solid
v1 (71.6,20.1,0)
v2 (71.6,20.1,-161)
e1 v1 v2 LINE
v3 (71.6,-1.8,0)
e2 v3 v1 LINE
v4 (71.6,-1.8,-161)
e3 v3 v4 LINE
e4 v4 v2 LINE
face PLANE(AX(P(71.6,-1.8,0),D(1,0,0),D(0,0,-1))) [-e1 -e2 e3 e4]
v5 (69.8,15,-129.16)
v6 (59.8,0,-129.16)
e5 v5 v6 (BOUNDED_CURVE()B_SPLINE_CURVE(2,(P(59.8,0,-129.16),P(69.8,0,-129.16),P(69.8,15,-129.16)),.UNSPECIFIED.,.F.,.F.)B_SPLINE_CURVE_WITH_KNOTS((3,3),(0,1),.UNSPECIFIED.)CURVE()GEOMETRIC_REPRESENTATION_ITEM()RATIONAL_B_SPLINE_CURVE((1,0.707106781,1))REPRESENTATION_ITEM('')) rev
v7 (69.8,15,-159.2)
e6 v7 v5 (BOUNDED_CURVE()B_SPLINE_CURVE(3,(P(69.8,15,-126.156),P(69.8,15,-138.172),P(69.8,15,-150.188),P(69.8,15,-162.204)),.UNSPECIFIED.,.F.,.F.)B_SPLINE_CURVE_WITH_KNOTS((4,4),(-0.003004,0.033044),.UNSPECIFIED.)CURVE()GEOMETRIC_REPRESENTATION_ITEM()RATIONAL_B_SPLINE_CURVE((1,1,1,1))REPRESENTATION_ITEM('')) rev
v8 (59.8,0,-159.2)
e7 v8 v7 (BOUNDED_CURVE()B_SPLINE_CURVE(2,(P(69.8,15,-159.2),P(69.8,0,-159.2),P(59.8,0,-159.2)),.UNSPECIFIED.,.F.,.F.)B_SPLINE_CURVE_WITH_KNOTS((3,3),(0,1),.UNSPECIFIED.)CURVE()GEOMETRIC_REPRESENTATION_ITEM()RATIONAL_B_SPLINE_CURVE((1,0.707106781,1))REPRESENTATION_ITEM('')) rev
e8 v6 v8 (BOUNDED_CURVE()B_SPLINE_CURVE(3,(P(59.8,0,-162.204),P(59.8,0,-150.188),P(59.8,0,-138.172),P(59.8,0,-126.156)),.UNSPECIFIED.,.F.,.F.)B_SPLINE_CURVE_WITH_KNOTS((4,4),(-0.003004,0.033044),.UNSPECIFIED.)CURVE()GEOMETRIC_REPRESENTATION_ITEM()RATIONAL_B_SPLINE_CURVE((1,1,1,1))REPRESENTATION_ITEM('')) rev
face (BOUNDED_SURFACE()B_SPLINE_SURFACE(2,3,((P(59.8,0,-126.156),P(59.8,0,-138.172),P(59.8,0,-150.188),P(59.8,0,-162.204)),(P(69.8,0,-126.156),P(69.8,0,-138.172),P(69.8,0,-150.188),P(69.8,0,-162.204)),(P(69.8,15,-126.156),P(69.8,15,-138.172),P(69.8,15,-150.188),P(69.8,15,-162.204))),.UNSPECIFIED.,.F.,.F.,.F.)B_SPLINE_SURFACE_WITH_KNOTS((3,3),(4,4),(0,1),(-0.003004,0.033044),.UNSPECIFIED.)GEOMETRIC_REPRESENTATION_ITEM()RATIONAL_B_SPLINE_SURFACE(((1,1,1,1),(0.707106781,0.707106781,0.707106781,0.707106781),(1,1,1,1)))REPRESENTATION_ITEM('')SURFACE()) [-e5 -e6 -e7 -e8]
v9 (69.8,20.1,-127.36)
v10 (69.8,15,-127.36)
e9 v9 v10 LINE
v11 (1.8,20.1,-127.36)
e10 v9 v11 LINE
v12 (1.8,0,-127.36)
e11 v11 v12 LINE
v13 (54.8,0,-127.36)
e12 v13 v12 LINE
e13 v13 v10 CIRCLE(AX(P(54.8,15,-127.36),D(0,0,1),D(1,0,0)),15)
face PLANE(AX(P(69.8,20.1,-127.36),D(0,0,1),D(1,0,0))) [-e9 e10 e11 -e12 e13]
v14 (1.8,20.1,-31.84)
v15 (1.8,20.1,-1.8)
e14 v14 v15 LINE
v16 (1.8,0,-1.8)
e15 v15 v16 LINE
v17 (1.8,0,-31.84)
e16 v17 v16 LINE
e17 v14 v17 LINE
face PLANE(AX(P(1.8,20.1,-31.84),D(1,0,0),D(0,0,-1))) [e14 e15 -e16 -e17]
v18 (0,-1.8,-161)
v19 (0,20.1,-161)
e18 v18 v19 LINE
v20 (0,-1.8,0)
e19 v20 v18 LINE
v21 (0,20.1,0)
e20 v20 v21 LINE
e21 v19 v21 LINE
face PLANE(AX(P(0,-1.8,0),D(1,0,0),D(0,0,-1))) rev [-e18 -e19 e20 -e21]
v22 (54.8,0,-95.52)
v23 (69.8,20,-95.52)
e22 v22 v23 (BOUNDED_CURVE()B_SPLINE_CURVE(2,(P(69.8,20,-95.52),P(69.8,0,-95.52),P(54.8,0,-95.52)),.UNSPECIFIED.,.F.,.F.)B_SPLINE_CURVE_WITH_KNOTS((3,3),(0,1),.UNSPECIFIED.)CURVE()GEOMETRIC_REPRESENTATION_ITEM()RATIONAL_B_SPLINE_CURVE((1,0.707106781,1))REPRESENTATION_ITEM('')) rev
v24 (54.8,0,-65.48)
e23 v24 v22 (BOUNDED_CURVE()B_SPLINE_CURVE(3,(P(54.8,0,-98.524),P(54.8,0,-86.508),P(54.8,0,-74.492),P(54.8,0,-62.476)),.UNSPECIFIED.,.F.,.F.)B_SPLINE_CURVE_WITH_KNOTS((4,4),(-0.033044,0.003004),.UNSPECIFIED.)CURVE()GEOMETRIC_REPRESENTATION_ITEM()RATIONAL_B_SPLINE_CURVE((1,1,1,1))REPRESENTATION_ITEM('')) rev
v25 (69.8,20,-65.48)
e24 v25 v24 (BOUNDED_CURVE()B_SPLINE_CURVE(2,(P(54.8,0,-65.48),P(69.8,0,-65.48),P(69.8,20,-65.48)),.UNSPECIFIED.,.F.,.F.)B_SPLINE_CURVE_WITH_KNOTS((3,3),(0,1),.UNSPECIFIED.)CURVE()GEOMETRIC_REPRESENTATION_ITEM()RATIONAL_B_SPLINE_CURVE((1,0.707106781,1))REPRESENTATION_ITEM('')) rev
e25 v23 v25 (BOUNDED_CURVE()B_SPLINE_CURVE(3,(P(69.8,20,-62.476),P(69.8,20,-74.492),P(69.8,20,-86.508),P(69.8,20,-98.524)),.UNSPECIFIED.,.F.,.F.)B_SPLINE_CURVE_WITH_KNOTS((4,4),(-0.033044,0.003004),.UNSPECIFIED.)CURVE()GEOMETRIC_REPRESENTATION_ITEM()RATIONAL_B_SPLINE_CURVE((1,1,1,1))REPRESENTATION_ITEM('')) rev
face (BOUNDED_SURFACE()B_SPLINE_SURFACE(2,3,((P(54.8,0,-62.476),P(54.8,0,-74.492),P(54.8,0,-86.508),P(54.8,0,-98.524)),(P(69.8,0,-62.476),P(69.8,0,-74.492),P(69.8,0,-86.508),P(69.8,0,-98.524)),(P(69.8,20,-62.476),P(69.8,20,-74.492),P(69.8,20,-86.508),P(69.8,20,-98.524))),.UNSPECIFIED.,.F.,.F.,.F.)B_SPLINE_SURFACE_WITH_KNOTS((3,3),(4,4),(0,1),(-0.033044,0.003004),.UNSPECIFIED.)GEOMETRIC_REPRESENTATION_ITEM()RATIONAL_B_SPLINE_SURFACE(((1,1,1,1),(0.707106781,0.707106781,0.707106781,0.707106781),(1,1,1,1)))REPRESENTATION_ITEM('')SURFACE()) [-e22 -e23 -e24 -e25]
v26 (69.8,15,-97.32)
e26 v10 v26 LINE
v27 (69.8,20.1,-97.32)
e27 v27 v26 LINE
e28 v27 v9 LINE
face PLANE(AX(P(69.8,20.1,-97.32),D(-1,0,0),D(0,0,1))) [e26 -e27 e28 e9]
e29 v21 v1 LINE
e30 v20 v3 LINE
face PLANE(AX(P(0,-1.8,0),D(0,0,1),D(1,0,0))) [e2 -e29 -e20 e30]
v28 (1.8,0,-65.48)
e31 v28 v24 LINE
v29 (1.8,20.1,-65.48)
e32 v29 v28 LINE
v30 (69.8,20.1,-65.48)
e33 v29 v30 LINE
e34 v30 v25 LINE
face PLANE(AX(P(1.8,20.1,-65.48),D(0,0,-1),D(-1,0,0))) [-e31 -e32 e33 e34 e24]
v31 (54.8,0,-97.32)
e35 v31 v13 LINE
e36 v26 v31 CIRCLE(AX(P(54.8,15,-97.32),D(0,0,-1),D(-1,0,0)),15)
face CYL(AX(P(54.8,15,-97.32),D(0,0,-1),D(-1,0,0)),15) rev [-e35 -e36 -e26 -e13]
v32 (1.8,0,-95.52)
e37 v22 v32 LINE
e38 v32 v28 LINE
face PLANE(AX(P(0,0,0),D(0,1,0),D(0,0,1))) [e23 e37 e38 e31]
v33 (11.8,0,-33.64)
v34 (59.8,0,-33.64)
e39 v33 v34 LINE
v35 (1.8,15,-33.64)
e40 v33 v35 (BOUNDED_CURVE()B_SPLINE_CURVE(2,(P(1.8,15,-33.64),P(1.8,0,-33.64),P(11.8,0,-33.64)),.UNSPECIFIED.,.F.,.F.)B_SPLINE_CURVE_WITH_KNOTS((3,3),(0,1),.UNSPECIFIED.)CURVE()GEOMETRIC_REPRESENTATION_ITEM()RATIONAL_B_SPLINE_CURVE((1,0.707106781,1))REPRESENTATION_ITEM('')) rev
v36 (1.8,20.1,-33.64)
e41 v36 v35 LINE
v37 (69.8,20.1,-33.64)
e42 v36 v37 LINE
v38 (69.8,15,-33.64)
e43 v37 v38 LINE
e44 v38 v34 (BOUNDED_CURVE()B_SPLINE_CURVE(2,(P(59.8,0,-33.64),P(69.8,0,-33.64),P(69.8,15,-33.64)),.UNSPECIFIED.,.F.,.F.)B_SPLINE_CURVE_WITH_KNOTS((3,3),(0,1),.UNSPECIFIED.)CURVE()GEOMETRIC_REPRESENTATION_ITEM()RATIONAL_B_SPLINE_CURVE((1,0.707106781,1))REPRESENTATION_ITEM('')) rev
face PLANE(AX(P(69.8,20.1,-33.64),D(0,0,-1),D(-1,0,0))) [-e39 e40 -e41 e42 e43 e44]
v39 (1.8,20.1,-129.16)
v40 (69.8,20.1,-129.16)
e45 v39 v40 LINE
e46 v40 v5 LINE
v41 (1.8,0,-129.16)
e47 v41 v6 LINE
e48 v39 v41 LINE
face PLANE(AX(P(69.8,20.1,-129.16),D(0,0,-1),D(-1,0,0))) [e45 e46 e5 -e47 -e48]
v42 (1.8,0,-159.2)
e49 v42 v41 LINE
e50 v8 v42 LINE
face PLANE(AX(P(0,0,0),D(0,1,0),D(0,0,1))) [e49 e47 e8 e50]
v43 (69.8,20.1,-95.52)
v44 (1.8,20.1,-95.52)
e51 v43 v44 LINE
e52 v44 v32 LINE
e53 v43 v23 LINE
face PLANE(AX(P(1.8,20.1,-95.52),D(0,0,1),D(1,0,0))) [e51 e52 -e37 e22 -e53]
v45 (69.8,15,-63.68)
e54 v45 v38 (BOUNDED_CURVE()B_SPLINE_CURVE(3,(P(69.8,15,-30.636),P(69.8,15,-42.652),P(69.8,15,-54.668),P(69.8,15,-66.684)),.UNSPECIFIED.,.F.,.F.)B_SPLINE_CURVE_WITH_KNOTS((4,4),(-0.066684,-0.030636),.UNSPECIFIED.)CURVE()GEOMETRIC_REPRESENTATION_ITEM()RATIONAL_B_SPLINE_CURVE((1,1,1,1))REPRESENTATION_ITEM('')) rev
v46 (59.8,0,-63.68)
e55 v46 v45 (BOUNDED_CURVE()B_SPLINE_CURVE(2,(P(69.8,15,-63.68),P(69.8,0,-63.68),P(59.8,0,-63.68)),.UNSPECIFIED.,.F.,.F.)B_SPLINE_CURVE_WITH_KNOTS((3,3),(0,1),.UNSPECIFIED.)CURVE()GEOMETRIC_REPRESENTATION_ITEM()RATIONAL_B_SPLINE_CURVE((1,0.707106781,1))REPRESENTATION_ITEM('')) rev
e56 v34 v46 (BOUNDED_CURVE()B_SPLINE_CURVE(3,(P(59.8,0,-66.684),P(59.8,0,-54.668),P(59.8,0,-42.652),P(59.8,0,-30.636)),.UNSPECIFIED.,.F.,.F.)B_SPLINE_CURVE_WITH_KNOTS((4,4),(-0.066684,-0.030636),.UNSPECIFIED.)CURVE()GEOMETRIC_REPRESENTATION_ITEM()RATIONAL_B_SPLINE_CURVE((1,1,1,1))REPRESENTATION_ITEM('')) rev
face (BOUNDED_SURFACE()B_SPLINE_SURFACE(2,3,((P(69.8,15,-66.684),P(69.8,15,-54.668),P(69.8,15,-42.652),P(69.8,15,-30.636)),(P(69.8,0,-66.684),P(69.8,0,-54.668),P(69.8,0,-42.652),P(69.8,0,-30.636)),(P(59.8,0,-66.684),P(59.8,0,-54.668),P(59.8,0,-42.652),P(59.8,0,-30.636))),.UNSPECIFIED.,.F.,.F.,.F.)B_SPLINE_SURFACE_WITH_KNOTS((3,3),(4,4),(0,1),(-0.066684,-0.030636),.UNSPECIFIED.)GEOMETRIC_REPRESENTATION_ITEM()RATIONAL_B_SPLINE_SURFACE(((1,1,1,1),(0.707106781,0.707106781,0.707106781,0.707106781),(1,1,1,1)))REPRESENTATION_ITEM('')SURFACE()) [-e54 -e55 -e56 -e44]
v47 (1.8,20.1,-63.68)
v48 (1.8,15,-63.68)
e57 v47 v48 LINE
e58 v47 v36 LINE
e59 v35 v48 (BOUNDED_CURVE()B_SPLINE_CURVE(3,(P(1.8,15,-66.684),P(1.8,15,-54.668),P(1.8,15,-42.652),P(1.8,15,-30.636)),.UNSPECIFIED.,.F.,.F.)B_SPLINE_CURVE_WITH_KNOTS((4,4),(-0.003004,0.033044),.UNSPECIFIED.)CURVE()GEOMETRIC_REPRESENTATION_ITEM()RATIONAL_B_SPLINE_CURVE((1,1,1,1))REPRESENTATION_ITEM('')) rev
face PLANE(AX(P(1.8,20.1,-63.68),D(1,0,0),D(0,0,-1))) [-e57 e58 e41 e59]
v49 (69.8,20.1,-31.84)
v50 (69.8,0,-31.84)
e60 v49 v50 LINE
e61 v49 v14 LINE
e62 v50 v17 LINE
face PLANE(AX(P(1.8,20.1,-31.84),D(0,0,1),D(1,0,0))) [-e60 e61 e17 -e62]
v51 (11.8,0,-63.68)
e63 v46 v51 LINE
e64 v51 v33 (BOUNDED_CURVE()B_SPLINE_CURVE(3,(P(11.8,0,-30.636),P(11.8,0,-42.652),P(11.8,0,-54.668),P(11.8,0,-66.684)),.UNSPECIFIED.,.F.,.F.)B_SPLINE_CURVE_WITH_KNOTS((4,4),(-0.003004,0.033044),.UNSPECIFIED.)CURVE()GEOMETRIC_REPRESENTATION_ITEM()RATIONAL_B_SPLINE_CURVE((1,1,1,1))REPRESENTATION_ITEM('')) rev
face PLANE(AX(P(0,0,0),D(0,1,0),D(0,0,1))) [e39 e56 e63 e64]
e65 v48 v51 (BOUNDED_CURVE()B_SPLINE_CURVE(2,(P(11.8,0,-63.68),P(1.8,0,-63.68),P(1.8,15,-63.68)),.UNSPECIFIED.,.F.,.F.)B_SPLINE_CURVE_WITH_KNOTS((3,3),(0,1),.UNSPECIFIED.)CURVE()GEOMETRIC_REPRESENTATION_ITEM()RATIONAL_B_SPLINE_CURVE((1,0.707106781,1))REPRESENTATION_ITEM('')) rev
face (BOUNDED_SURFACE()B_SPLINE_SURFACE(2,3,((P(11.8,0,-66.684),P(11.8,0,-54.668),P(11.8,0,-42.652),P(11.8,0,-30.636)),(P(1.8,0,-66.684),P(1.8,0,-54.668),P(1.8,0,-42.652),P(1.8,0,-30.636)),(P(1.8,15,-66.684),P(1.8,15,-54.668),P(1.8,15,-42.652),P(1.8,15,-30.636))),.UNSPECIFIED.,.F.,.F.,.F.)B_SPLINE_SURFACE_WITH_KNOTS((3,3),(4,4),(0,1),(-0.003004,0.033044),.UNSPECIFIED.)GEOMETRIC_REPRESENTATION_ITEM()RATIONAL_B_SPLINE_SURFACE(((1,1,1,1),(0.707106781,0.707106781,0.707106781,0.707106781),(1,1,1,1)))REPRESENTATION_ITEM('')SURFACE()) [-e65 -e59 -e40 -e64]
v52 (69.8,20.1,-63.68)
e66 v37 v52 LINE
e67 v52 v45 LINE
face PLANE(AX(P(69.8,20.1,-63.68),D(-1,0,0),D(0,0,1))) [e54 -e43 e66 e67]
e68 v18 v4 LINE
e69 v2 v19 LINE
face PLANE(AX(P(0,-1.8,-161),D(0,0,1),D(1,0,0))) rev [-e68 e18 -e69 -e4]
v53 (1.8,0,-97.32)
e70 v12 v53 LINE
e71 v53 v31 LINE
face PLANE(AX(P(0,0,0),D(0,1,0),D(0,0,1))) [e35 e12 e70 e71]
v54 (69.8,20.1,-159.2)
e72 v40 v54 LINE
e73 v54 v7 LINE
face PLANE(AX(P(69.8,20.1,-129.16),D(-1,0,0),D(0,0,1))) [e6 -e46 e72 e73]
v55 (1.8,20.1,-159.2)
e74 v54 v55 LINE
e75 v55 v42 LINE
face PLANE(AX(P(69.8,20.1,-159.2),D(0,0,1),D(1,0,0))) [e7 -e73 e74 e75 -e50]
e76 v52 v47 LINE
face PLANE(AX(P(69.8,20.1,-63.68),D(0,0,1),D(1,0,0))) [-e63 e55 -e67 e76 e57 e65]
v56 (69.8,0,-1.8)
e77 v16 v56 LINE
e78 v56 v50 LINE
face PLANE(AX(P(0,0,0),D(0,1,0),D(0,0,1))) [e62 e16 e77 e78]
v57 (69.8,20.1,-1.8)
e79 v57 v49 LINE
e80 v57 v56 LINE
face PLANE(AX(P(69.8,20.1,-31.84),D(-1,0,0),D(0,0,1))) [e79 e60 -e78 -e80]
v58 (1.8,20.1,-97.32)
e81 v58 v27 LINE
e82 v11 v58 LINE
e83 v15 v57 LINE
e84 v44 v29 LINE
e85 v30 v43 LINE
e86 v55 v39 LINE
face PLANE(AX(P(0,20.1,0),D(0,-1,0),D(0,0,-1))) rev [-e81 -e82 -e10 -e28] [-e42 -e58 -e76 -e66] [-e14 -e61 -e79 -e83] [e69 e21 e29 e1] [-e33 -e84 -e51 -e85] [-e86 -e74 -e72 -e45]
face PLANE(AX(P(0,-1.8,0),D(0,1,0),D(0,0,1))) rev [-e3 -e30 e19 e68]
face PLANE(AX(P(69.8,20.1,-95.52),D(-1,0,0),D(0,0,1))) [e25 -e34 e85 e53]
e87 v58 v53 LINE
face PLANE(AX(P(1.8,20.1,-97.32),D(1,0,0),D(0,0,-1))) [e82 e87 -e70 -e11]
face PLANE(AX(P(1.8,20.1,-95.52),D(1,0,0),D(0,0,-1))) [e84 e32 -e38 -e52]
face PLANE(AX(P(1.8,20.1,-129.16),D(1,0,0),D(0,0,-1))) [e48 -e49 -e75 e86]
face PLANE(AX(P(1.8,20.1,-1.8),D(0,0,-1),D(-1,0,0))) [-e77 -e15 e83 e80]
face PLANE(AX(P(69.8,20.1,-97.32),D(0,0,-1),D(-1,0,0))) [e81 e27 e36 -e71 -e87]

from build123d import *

# Parameters (mm, degrees)
SKETCH1_W           = 71.6
SKETCH1_H           = 161
SKETCH1_W_2         = 68
SKETCH1_H_2         = 30.04
BOSS_EXTRUDE1_DEPTH = 1.8
SKETCH1_6_W         = 71.6
SKETCH1_6_H         = 161
SKETCH1_6_W_2       = 68
SKETCH1_6_H_2       = 30.04
BOSS_EXTRUDE2_DEPTH = 20.1
FILLET3_SIZE        = 15
FILLET3_SIZE_2      = 10
FILLET4_R           = 15
FILLET5_SIZE        = 20
FILLET5_SIZE_2      = 15
FILLET6_SIZE        = 10
FILLET6_SIZE_2      = 15
FILLET7_SIZE        = 10
FILLET7_SIZE_2      = 15


with BuildPart() as part:
    # Sketch1 → Boss-Extrude1 (new body)
    # profile 1 of 6: a face of its own
    with BuildSketch(Plane(origin=(0, 0, 0), x_dir=(1, 0, 0), z_dir=(0, 1, 0))):
        with Locations((35.8, 80.5)):
            Rectangle(SKETCH1_W, SKETCH1_H)
        with Locations((35.8, 48.66)):
            Rectangle(SKETCH1_W_2, SKETCH1_H_2, mode=Mode.SUBTRACT)
        with Locations((35.8, 16.82)):
            Rectangle(SKETCH1_W_2, SKETCH1_H_2, mode=Mode.SUBTRACT)
        with Locations((35.8, 80.5)):
            Rectangle(SKETCH1_W_2, SKETCH1_H_2, mode=Mode.SUBTRACT)
        with Locations((35.8, 112.34)):
            Rectangle(SKETCH1_W_2, SKETCH1_H_2, mode=Mode.SUBTRACT)
        with Locations((35.8, 144.18)):
            Rectangle(SKETCH1_W_2, SKETCH1_H_2, mode=Mode.SUBTRACT)
    # profile 2 of 6: a face of its own
    with BuildSketch(Plane(origin=(0, 0, 0), x_dir=(1, 0, 0), z_dir=(0, 1, 0))):
        with Locations((35.8, 144.18)):
            Rectangle(SKETCH1_W_2, SKETCH1_H_2)
    # profile 3 of 6: a face of its own
    with BuildSketch(Plane(origin=(0, 0, 0), x_dir=(1, 0, 0), z_dir=(0, 1, 0))):
        with Locations((35.8, 112.34)):
            Rectangle(SKETCH1_W_2, SKETCH1_H_2)
    # profile 4 of 6: a face of its own
    with BuildSketch(Plane(origin=(0, 0, 0), x_dir=(1, 0, 0), z_dir=(0, 1, 0))):
        with Locations((35.8, 80.5)):
            Rectangle(SKETCH1_W_2, SKETCH1_H_2)
    # profile 5 of 6: a face of its own
    with BuildSketch(Plane(origin=(0, 0, 0), x_dir=(1, 0, 0), z_dir=(0, 1, 0))):
        with Locations((35.8, 48.66)):
            Rectangle(SKETCH1_W_2, SKETCH1_H_2)
    # profile 6 of 6: a face of its own
    with BuildSketch(Plane(origin=(0, 0, 0), x_dir=(1, 0, 0), z_dir=(0, 1, 0))):
        with Locations((35.8, 16.82)):
            Rectangle(SKETCH1_W_2, SKETCH1_H_2)
    extrude(amount=-BOSS_EXTRUDE1_DEPTH)

    # Sketch1<6> → Boss-Extrude2 (add)
    with BuildSketch(Plane(origin=(0, 0, 0), x_dir=(1, 0, 0), z_dir=(0, 1, 0))):
        with Locations((35.8, 80.5)):
            Rectangle(SKETCH1_6_W, SKETCH1_6_H)
        with Locations((35.8, 16.82)):
            Rectangle(SKETCH1_6_W_2, SKETCH1_6_H_2, mode=Mode.SUBTRACT)
        with Locations((35.8, 80.5)):
            Rectangle(SKETCH1_6_W_2, SKETCH1_6_H_2, mode=Mode.SUBTRACT)
        with Locations((35.8, 48.66)):
            Rectangle(SKETCH1_6_W_2, SKETCH1_6_H_2, mode=Mode.SUBTRACT)
        with Locations((35.8, 112.34)):
            Rectangle(SKETCH1_6_W_2, SKETCH1_6_H_2, mode=Mode.SUBTRACT)
        with Locations((35.8, 144.18)):
            Rectangle(SKETCH1_6_W_2, SKETCH1_6_H_2, mode=Mode.SUBTRACT)
    extrude(amount=BOSS_EXTRUDE2_DEPTH)

    # Fillet3
    # an asymmetric fillet: 15, 10 mm, written as the material it adds along each edge
    with BuildSketch(Plane(origin=(69.8, 0, -159.2), x_dir=(0, 1, 0), z_dir=(0, 0, 1))) as fillet3_piece_1_section:
        with BuildLine():
            Bezier((FILLET3_SIZE, 0), (0, 0), (0, FILLET3_SIZE_2), weights=[1, 0.707106781, 1])
            Line((0, FILLET3_SIZE_2), (0, 0))
            Line((0, 0), (FILLET3_SIZE, 0))
        make_face()
    fillet3_piece_1 = extrude(amount=67.54, mode=Mode.PRIVATE)
    fillet3_piece_1 = split(fillet3_piece_1, bisect_by=Plane(origin=(67.566321176, 3.350519055, -127.36), z_dir=(0, 0, -1)), keep=Keep.TOP, mode=Mode.PRIVATE)
    add(fillet3_piece_1)

    # Fillet4
    fillet4_edges = [part.edges().sort_by_distance(p)[0] for p in [
        (69.8, 0, -112.34),
    ]]
    fillet(fillet4_edges, radius=FILLET4_R)

    # Fillet5
    # an asymmetric fillet: 20, 15 mm, written as the material it adds along each edge
    with BuildSketch(Plane(origin=(69.8, 0, -95.52), x_dir=(0, 1, 0), z_dir=(0, 0, 1))) as fillet5_piece_1_section:
        with BuildLine():
            Bezier((FILLET5_SIZE, 0), (0, 0), (0, FILLET5_SIZE_2), weights=[1, 0.707106781, 1])
            Line((0, FILLET5_SIZE_2), (0, 0))
            Line((0, 0), (FILLET5_SIZE, 0))
        make_face()
    fillet5_piece_1 = extrude(amount=80.04, mode=Mode.PRIVATE)
    fillet5_piece_1 = split(fillet5_piece_1, bisect_by=Plane(origin=(69.753885797, 17.321244921, -63.68), z_dir=(0, 0, -1)), keep=Keep.TOP, mode=Mode.PRIVATE)
    add(fillet5_piece_1)

    # Fillet6
    # an asymmetric fillet: 15, 10 mm, written as the material it adds along each edge
    with BuildSketch(Plane(origin=(1.8, 0, -101.18), x_dir=(1, 0, 0), z_dir=(0, 0, 1))) as fillet6_piece_1_section:
        with BuildLine():
            Bezier((FILLET6_SIZE, 0), (0, 0), (0, FILLET6_SIZE_2), weights=[1, 0.707106781, 1])
            Line((0, FILLET6_SIZE_2), (0, 0))
            Line((0, 0), (FILLET6_SIZE, 0))
        make_face()
    fillet6_piece_1 = extrude(amount=105.04, mode=Mode.PRIVATE)
    fillet6_piece_1 = split(fillet6_piece_1, bisect_by=Plane(origin=(4.033678617, 3.350518679, -31.84), z_dir=(0, 0, -1)), keep=Keep.TOP, mode=Mode.PRIVATE)
    fillet6_piece_1 = split(fillet6_piece_1, bisect_by=Plane(origin=(4.033678617, 3.350518679, -65.48), z_dir=(0, 0, 1)), keep=Keep.TOP, mode=Mode.PRIVATE)
    add(fillet6_piece_1)

    # Fillet7
    # an asymmetric fillet: 15, 10 mm, written as the material it adds along each edge
    with BuildSketch(Plane(origin=(69.8, 0, 3.86), x_dir=(-1, 0, 0), z_dir=(0, 0, -1))) as fillet7_piece_1_section:
        with BuildLine():
            Bezier((FILLET7_SIZE, 0), (0, 0), (0, FILLET7_SIZE_2), weights=[1, 0.707106781, 1])
            Line((0, FILLET7_SIZE_2), (0, 0))
            Line((0, 0), (FILLET7_SIZE, 0))
        make_face()
    fillet7_piece_1 = extrude(amount=105.04, mode=Mode.PRIVATE)
    fillet7_piece_1 = split(fillet7_piece_1, bisect_by=Plane(origin=(67.566321383, 3.350518679, -31.84), z_dir=(0, 0, -1)), keep=Keep.TOP, mode=Mode.PRIVATE)
    add(fillet7_piece_1)


solid = part.part
